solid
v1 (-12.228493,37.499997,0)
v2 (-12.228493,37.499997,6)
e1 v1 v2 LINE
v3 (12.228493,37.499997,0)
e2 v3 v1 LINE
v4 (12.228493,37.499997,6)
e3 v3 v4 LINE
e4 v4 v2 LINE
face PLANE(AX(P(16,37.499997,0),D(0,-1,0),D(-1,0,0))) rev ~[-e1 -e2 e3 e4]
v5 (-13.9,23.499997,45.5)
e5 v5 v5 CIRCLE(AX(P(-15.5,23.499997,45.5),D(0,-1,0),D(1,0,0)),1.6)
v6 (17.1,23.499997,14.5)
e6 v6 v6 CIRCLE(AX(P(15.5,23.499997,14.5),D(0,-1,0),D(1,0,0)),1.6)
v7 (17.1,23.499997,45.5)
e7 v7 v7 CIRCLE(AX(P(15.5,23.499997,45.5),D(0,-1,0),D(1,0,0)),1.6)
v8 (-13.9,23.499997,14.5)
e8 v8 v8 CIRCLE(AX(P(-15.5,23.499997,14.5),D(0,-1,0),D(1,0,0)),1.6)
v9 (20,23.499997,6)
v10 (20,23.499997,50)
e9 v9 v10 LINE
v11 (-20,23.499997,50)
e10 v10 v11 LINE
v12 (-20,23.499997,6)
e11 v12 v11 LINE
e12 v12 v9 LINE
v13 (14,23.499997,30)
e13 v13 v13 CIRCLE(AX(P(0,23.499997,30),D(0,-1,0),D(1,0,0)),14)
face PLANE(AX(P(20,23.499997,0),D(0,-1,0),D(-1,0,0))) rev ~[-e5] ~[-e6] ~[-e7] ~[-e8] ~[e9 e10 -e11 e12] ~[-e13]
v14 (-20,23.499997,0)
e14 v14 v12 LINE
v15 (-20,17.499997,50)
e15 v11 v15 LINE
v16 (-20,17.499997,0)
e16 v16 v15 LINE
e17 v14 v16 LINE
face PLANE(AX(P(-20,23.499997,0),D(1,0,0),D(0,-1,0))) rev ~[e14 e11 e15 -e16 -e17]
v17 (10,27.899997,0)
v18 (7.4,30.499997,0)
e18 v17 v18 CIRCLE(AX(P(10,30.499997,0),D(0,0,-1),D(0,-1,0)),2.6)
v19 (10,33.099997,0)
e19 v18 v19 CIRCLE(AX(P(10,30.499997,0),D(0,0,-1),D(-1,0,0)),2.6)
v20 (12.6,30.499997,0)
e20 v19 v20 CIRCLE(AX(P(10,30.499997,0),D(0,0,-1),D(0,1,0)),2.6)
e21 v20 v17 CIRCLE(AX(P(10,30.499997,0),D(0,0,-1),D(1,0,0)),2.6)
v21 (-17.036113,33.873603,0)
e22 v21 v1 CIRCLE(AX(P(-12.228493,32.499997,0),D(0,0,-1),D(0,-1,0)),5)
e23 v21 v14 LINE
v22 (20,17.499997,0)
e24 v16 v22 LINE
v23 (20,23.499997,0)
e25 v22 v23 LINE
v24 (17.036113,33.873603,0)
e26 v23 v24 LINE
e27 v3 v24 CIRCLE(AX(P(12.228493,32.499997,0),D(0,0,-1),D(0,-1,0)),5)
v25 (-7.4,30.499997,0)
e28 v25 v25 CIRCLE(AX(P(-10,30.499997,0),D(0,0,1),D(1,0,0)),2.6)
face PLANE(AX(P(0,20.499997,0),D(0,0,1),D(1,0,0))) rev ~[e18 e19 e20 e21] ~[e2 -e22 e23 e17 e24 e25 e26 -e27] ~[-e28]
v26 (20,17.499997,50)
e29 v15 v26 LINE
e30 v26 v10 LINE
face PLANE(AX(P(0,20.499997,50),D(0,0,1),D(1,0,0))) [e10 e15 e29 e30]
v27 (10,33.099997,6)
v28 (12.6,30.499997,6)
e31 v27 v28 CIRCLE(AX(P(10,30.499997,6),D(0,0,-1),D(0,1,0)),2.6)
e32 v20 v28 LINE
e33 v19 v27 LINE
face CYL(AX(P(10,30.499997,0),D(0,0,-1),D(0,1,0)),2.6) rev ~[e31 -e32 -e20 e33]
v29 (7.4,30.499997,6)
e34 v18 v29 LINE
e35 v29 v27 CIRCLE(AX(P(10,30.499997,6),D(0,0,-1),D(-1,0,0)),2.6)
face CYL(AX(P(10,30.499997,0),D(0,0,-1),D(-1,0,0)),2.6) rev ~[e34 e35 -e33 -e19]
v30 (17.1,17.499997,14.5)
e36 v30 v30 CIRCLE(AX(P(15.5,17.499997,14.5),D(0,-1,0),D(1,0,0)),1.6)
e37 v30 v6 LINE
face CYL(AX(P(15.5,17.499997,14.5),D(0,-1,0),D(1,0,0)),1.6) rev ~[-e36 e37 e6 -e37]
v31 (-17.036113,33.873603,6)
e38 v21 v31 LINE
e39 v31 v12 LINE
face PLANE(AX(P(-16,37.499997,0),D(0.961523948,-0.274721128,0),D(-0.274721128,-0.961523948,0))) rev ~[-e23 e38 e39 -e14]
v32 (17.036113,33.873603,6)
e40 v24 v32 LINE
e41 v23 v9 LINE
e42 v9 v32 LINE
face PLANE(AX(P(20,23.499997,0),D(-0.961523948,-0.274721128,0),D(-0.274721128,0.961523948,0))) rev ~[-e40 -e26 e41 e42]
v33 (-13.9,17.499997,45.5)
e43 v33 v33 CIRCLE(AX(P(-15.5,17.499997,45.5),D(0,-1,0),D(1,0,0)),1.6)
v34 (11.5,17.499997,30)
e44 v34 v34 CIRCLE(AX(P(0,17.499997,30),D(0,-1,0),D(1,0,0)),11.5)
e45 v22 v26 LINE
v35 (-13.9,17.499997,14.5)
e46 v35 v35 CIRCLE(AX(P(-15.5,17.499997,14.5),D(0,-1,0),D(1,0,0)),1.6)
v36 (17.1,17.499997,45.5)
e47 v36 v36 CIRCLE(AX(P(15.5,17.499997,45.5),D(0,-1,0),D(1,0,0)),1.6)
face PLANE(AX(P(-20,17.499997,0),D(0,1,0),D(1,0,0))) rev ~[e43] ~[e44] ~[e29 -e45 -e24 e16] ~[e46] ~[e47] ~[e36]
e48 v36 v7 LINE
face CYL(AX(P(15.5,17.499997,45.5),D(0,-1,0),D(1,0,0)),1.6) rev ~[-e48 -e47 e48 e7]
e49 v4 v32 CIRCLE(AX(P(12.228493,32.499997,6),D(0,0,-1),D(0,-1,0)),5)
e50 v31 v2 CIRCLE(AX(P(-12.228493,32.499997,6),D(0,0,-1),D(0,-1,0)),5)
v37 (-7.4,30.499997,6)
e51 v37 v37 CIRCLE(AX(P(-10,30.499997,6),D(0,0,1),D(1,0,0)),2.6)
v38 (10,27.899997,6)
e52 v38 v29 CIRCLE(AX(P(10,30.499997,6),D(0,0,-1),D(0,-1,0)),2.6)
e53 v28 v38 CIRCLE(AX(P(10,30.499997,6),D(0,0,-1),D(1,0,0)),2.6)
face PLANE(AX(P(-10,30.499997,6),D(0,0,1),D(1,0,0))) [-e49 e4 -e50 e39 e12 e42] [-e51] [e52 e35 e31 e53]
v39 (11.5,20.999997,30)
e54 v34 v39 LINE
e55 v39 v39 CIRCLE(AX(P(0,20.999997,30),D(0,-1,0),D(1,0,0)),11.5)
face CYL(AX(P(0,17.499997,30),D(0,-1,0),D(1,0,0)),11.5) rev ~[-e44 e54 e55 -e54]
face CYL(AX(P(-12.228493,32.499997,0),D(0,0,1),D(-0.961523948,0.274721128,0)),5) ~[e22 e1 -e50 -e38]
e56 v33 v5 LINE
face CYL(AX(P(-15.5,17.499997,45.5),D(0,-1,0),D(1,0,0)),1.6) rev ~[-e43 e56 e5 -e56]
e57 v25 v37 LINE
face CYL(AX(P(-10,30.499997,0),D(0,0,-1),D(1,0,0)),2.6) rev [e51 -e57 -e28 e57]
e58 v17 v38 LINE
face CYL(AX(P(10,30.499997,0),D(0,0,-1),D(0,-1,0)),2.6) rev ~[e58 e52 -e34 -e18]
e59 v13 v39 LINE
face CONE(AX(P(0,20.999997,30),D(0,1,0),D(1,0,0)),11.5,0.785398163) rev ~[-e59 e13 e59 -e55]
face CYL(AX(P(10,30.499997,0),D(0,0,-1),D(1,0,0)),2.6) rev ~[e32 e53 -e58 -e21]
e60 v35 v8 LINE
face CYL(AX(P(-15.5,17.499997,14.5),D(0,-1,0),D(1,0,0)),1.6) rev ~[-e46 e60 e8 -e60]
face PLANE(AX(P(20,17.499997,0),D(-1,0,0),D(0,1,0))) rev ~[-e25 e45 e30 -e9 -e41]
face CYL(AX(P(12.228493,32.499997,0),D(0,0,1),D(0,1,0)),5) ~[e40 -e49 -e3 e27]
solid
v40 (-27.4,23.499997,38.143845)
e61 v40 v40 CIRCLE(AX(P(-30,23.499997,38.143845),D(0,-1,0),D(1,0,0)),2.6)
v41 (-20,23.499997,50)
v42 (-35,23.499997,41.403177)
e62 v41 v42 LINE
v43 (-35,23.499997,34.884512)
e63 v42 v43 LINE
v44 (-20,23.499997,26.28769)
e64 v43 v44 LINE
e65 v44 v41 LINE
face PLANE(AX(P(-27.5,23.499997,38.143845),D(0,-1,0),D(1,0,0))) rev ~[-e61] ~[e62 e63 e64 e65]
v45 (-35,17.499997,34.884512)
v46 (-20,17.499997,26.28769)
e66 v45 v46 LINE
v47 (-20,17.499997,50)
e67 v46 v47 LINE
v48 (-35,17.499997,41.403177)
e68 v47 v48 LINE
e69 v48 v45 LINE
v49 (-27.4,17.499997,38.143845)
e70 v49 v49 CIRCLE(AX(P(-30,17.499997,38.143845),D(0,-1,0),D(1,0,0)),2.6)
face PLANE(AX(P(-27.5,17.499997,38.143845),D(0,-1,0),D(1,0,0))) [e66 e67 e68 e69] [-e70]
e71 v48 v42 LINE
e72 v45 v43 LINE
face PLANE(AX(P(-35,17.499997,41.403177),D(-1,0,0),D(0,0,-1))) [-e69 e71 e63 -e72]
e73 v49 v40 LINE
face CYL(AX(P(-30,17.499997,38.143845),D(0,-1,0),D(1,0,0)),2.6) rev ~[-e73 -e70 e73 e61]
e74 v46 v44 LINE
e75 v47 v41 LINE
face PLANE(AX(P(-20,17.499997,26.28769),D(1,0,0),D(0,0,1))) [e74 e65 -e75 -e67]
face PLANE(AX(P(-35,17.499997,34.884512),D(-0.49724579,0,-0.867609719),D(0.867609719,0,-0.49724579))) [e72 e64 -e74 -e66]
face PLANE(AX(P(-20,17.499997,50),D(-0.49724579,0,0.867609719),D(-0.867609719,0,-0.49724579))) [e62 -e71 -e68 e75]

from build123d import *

# Parameters (mm, degrees)
F1_W     = 12
F1_H     = 14
F1_R     = 2.6
F2_DEPTH = 6
F3_DEPTH = 50
F4_R     = 11.5
F4_R_2   = 1.6
F5_DEPTH = 20.001
F6_R     = 2.6
F7_DEPTH = 6
F8_R     = 5
F9_SIZE  = 2.5


# Not quite as in the source:
# - a feature names something its author has since deleted; it is built from what else it names


with BuildPart() as f2:
    # F1 (on Top) → F2 (new body)
    with BuildSketch(Plane.XY):
        with Locations((-10, 30.4999971617)):
            Rectangle(F1_W, F1_H)
        with Locations((-10, 30.4999971617)):
            Circle(F1_R, mode=Mode.SUBTRACT)
        with BuildLine():
            Line((10, 33.0999971617), (10, 37.4999971617))
            Line((10, 37.4999971617), (4, 37.4999971617))
            Line((4, 37.4999971617), (4, 30.4999971617))
            Line((4, 30.4999971617), (7.4, 30.4999971617))
            ThreePointArc((7.4, 30.4999971617), (8.1615223689, 32.3384747928), (10, 33.0999971617))
        make_face()
        with BuildLine():
            Line((16, 30.4999971617), (16, 37.4999971617))
            Line((16, 37.4999971617), (10, 37.4999971617))
            Line((10, 37.4999971617), (10, 33.0999971617))
            ThreePointArc((10, 33.0999971617), (11.8384776311, 32.3384747928), (12.6, 30.4999971617))
            Line((12.6, 30.4999971617), (16, 30.4999971617))
        make_face()
        with BuildLine():
            Line((10, 23.4999971617), (16, 23.4999971617))
            Line((16, 23.4999971617), (16, 30.4999971617))
            Line((16, 30.4999971617), (12.6, 30.4999971617))
            ThreePointArc((12.6, 30.4999971617), (11.8384776311, 28.6615195306), (10, 27.8999971617))
            Line((10, 27.8999971617), (10, 23.4999971617))
        make_face()
        with BuildLine():
            Line((4, 23.4999971617), (10, 23.4999971617))
            Line((10, 23.4999971617), (10, 27.8999971617))
            ThreePointArc((10, 27.8999971617), (8.1615223689, 28.6615195306), (7.4, 30.4999971617))
            Line((7.4, 30.4999971617), (4, 30.4999971617))
            Line((4, 30.4999971617), (4, 23.4999971617))
        make_face()
        Polygon((-16, 37.4999971617), (-20, 23.4999971617), (-16, 23.4999971617), align=None)
        Polygon((-4, 37.4999971617), (-4, 23.4999971617), (4, 23.4999971617), (4, 30.4999971617), (4, 37.4999971617), align=None)
        Polygon((16, 23.4999971617), (20, 23.4999971617), (16, 37.4999971617), (16, 30.4999971617), align=None)
    extrude(amount=F2_DEPTH)

    # F1 (on Top) → F3 (join)
    with BuildSketch(Plane.XY):
        Polygon((-20, 23.4999971617), (-20, 17.4999971617), (20, 17.4999971617), (20, 23.4999971617), (16, 23.4999971617), (10, 23.4999971617), (4, 23.4999971617), (-4, 23.4999971617), (-16, 23.4999971617), align=None)
    extrude(amount=F3_DEPTH)

    # F4 (on face) → F5 (cut, through all)
    with BuildSketch(Plane.XZ.offset(-17.4999971617)):
        with Locations((0, 30)):
            Circle(F4_R)
        with Locations((-15.5, 45.5)):
            Circle(F4_R_2)
        with Locations((-15.5, 14.5)):
            Circle(F4_R_2)
        with Locations((15.5, 14.5)):
            Circle(F4_R_2)
        with Locations((15.5, 45.5)):
            Circle(F4_R_2)
    extrude(amount=-F5_DEPTH, mode=Mode.SUBTRACT)

    # F8
    f8_edges = [f2.edges().sort_by_distance(p)[0] for p in [
        (16, 37.499997, 3),
        (-16, 37.499997, 3),
    ]]
    fillet(f8_edges, radius=F8_R)

    # F9
    f9_edges = [f2.edges().sort_by_distance(p)[0] for p in [
        (-11.5, 23.499997, 30),
    ]]
    chamfer(f9_edges, length=F9_SIZE)


with BuildPart() as f7:
    # F6 (on face) → F7 (new body)
    with BuildSketch(Plane.XZ.offset(-17.4999971617)):
        Polygon((-20, 38.1438449025), (-20, 41.4031773806), (-35, 41.4031773806), (-35, 34.8845124245), (-20, 34.8845124245), align=None)
        with Locations((-30, 38.1438449025)):
            Circle(F6_R, mode=Mode.SUBTRACT)
        Polygon((-35, 41.4031773806), (-20, 41.4031773806), (-20, 50), align=None)
        Polygon((-20, 34.8845124245), (-35, 34.8845124245), (-20, 26.287689805), align=None)
    extrude(amount=-F7_DEPTH)


solid = Compound([f2.part, f7.part])
